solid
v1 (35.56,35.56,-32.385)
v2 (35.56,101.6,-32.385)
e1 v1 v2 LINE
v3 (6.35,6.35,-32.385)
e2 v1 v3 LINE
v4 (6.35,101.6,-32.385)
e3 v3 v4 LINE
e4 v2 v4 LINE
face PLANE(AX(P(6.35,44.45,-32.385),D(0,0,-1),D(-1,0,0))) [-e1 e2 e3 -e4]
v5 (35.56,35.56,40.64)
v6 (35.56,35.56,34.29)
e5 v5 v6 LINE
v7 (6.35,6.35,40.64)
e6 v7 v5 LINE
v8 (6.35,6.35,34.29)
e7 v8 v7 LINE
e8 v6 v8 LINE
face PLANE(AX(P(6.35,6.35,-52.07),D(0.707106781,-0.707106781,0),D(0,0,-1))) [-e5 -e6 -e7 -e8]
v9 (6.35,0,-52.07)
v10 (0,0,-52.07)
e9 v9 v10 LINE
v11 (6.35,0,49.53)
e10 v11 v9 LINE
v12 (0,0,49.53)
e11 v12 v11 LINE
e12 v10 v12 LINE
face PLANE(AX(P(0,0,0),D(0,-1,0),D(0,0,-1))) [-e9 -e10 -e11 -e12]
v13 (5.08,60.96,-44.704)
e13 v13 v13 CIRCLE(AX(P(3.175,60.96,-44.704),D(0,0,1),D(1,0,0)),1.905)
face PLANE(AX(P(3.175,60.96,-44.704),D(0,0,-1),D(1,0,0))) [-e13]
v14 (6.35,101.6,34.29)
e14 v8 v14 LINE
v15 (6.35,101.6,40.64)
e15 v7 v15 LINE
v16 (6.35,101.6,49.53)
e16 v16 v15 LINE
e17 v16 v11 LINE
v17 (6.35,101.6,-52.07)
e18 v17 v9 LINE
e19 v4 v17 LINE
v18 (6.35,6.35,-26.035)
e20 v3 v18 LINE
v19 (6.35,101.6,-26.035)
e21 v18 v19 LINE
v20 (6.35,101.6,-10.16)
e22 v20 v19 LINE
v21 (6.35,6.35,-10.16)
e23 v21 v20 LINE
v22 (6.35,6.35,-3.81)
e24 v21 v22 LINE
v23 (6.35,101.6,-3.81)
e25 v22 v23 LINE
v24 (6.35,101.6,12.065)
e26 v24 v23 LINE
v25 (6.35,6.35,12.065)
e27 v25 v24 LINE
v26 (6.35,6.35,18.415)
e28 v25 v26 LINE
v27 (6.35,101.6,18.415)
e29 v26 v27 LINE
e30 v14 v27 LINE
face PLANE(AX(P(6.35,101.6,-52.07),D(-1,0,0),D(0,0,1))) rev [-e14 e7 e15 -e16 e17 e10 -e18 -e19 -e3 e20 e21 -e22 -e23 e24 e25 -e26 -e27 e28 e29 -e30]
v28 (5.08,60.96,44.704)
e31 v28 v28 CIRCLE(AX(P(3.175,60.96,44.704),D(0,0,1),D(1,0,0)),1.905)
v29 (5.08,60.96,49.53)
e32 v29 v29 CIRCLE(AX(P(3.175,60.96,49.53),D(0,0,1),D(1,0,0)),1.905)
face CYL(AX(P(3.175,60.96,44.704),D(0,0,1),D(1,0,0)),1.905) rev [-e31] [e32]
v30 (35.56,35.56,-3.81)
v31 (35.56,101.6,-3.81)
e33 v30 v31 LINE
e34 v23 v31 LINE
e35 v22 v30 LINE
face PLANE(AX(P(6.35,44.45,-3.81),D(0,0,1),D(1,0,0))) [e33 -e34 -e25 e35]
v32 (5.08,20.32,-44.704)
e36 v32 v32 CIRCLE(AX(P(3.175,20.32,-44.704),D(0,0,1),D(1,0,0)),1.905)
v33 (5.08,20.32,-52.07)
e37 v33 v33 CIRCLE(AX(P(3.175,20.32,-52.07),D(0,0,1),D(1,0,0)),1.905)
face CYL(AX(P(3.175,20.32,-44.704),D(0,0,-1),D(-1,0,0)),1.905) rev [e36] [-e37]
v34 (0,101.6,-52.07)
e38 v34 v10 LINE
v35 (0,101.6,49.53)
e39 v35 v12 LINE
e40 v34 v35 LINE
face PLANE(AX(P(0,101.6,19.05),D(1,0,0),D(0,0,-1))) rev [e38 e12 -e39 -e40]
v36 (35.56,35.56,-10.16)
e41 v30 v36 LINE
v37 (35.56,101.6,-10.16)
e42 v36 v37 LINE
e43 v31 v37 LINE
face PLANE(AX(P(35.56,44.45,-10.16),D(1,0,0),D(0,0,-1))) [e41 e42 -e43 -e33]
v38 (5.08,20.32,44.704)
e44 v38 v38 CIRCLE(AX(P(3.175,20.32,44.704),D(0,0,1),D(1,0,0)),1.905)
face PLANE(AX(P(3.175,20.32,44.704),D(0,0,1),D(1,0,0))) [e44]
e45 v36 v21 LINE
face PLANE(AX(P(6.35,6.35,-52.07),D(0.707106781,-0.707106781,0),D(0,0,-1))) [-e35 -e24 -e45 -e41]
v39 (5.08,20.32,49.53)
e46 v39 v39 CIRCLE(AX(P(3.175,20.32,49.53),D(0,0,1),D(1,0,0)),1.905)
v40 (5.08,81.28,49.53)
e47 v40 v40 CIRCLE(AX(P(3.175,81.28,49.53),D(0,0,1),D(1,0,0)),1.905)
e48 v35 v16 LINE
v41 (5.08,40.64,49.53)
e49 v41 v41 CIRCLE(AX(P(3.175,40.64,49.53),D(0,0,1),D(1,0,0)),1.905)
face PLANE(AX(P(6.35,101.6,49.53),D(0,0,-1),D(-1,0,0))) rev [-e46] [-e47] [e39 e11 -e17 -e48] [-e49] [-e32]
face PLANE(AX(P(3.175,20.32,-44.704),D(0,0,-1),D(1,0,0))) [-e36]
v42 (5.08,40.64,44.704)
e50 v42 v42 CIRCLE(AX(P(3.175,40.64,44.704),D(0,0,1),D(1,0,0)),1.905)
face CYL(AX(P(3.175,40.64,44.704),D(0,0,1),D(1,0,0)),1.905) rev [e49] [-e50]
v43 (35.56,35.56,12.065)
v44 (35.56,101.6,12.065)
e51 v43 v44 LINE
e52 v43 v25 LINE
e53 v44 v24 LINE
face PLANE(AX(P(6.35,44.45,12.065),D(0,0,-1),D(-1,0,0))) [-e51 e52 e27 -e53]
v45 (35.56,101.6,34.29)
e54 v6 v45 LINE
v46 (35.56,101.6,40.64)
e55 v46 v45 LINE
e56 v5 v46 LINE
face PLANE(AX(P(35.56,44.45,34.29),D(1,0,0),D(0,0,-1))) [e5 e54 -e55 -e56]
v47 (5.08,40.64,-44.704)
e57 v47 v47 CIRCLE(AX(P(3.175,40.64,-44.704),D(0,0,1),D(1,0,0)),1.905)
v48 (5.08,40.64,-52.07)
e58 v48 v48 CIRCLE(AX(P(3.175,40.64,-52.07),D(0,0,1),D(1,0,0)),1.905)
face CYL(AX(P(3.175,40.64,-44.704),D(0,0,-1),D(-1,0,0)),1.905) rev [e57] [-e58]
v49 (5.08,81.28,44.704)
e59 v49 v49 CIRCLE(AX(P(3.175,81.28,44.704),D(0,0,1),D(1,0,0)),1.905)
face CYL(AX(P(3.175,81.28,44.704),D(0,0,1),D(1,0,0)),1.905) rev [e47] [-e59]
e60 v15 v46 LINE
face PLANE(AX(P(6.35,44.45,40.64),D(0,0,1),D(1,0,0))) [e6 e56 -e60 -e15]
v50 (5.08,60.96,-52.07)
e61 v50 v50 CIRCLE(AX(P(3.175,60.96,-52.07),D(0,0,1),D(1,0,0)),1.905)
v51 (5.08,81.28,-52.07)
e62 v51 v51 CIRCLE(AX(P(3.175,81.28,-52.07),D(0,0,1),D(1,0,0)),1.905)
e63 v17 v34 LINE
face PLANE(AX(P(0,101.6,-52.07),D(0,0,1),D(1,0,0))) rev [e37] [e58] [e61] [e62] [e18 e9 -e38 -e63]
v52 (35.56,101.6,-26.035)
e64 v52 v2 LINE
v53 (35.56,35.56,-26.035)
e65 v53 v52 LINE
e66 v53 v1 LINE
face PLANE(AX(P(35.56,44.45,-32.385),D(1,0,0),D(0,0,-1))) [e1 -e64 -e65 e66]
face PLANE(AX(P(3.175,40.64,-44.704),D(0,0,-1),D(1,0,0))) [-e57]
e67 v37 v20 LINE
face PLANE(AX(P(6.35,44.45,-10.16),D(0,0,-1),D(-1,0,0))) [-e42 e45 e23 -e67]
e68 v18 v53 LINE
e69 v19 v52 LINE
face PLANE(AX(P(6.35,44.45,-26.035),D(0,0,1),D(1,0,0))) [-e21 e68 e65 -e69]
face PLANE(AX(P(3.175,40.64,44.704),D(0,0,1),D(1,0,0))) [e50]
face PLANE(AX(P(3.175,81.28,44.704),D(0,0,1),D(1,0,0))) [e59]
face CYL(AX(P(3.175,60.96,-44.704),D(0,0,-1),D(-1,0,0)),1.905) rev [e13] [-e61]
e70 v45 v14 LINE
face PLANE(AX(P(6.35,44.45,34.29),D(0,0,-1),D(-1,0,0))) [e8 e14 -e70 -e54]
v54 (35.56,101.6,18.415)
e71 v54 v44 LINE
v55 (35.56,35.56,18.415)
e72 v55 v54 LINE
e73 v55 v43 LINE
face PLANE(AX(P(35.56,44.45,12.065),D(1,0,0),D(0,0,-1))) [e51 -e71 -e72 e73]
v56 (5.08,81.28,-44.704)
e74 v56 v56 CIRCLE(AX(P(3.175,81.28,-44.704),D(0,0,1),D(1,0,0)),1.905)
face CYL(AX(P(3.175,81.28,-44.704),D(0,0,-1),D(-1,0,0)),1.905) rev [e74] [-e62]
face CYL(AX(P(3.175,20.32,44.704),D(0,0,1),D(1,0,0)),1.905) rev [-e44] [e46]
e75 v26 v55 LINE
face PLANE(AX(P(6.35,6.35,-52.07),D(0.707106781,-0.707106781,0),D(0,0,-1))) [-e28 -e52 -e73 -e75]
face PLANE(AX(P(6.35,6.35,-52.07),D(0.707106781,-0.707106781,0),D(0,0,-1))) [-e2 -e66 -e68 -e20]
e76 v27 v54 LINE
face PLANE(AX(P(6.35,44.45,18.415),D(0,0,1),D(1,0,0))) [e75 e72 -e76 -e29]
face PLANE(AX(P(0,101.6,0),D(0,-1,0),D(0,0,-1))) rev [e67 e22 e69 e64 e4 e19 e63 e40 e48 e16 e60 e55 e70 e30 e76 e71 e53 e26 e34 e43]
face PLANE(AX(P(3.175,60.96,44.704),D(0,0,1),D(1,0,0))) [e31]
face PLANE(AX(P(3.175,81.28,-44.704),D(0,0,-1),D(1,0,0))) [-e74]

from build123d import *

# Parameters (mm, degrees)
BOSS_EXTRUDE1_DEPTH = 101.6
SKETCH2_R           = 1.905
CUT_EXTRUDE1_DEPTH  = 4.826
SKETCH5_W           = 29.21
SKETCH5_H           = 6.35
BOSS_EXTRUDE2_DEPTH = 57.15
CHAMFER1_SIZE       = 38.1
CUT_EXTRUDE2_START  = -101.6
SKETCH2_2_R         = 1.905
CUT_EXTRUDE2_DEPTH  = 4.826


with BuildPart() as part:
    # Sketch1 → Boss-Extrude1 (new body)
    with BuildSketch(Plane(origin=(0, 0, 0), x_dir=(1, 0, 0), z_dir=(0, 1, 0))):
        Polygon((0, -19.05), (0, 19.05), (0, 52.07), (6.35, 52.07), (6.35, 19.05), (6.35, -19.05), (6.35, -49.53), (0, -49.53), align=None)
    extrude(amount=BOSS_EXTRUDE1_DEPTH)

    # Sketch2 → Cut-Extrude1 (cut)
    with BuildSketch(Plane.XY.offset(49.53)):
        with Locations((3.175, 81.28)):
            Circle(SKETCH2_R)
        with Locations((3.175, 60.96)):
            Circle(SKETCH2_R)
        with Locations((3.175, 20.32)):
            Circle(SKETCH2_R)
        with Locations((3.175, 40.64)):
            Circle(SKETCH2_R)
    cut_extrude1 = extrude(amount=-CUT_EXTRUDE1_DEPTH, mode=Mode.SUBTRACT)

    # Mirror1: Cut-Extrude1 across plane
    add(cut_extrude1.mirror(Plane.XY), mode=Mode.SUBTRACT)

    # Sketch5 → Boss-Extrude2 (add)
    with BuildSketch(Plane(origin=(0, 101.6, 0), x_dir=(1, 0, 0), z_dir=(0, 1, 0))):
        with Locations((20.955, 29.21)):
            Rectangle(SKETCH5_W, SKETCH5_H)
        with Locations((20.955, 6.985)):
            Rectangle(SKETCH5_W, SKETCH5_H)
        with Locations((20.955, -15.24)):
            Rectangle(SKETCH5_W, SKETCH5_H)
        with Locations((20.955, -37.465)):
            Rectangle(SKETCH5_W, SKETCH5_H)
    extrude(amount=-BOSS_EXTRUDE2_DEPTH)

    # Chamfer1
    # the kernel refuses this chamfer: 38.1 mm, written as the material it adds along each edge
    with BuildSketch(Plane(origin=(6.35, 44.45, 71.946121842), x_dir=(-0.02749587661058638, -0.9996219169112968, 0), z_dir=(0, 0, -1))) as chamfer1_piece_1_section:
        Polygon((CHAMFER1_SIZE * 0.999621916911, -CHAMFER1_SIZE * 0.0274958766106), (-CHAMFER1_SIZE * 0.0274958766106, -CHAMFER1_SIZE * 0.999621916911), (0, 0), align=None)
    chamfer1_piece_1 = extrude(amount=104.331121842, mode=Mode.PRIVATE)
    chamfer1_piece_1 = split(chamfer1_piece_1, bisect_by=Plane(origin=(17.461394365, 31.123016765, 40.64), z_dir=(0, 0, -1)), keep=Keep.TOP, mode=Mode.PRIVATE)
    chamfer1_piece_1 = split(chamfer1_piece_1, bisect_by=Plane(origin=(17.461394365, 31.123016765, 34.29), z_dir=(0, 0, 1)), keep=Keep.TOP, mode=Mode.PRIVATE)
    chamfer1_piece_1 = split(chamfer1_piece_1, bisect_by=Plane(origin=(35.56, 31.123016765, 37.465), z_dir=(-1, 0, 0)), keep=Keep.TOP, mode=Mode.PRIVATE)
    add(chamfer1_piece_1)
    with BuildSketch(Plane(origin=(6.35, 44.45, 71.946121842), x_dir=(-0.02749587661058638, -0.9996219169112968, 0), z_dir=(0, 0, -1))) as chamfer1_piece_2_section:
        Polygon((CHAMFER1_SIZE * 0.999621916911, -CHAMFER1_SIZE * 0.0274958766106), (-CHAMFER1_SIZE * 0.0274958766106, -CHAMFER1_SIZE * 0.999621916911), (0, 0), align=None)
    chamfer1_piece_2 = extrude(amount=104.331121842, mode=Mode.PRIVATE)
    chamfer1_piece_2 = split(chamfer1_piece_2, bisect_by=Plane(origin=(35.56, 31.123016765, 15.24), z_dir=(-1, 0, 0)), keep=Keep.TOP, mode=Mode.PRIVATE)
    chamfer1_piece_2 = split(chamfer1_piece_2, bisect_by=Plane(origin=(17.461394365, 31.123016765, 18.415), z_dir=(0, 0, -1)), keep=Keep.TOP, mode=Mode.PRIVATE)
    chamfer1_piece_2 = split(chamfer1_piece_2, bisect_by=Plane(origin=(17.461394365, 31.123016765, 12.065), z_dir=(0, 0, 1)), keep=Keep.TOP, mode=Mode.PRIVATE)
    add(chamfer1_piece_2)
    with BuildSketch(Plane(origin=(6.35, 44.45, 71.946121842), x_dir=(-0.02749587661058638, -0.9996219169112968, 0), z_dir=(0, 0, -1))) as chamfer1_piece_3_section:
        Polygon((CHAMFER1_SIZE * 0.999621916911, -CHAMFER1_SIZE * 0.0274958766106), (-CHAMFER1_SIZE * 0.0274958766106, -CHAMFER1_SIZE * 0.999621916911), (0, 0), align=None)
    chamfer1_piece_3 = extrude(amount=104.331121842, mode=Mode.PRIVATE)
    chamfer1_piece_3 = split(chamfer1_piece_3, bisect_by=Plane(origin=(35.56, 31.123016765, -6.985), z_dir=(-1, 0, 0)), keep=Keep.TOP, mode=Mode.PRIVATE)
    chamfer1_piece_3 = split(chamfer1_piece_3, bisect_by=Plane(origin=(17.461394365, 31.123016765, -3.81), z_dir=(0, 0, -1)), keep=Keep.TOP, mode=Mode.PRIVATE)
    chamfer1_piece_3 = split(chamfer1_piece_3, bisect_by=Plane(origin=(17.461394365, 31.123016765, -10.16), z_dir=(0, 0, 1)), keep=Keep.TOP, mode=Mode.PRIVATE)
    add(chamfer1_piece_3)
    with BuildSketch(Plane(origin=(6.35, 44.45, -26.035), x_dir=(-0.027495876610586018, -0.9996219169112968, 0), z_dir=(0, 0, -1))) as chamfer1_piece_4_section:
        Polygon((CHAMFER1_SIZE * 0.999621916911, -CHAMFER1_SIZE * 0.0274958766106), (-CHAMFER1_SIZE * 0.0274958766106, -CHAMFER1_SIZE * 0.999621916911), (0, 0), align=None)
    chamfer1_piece_4 = extrude(amount=6.35, mode=Mode.PRIVATE)
    chamfer1_piece_4 = split(chamfer1_piece_4, bisect_by=Plane(origin=(35.56, 31.123016765, -29.21), z_dir=(-1, 0, 0)), keep=Keep.TOP, mode=Mode.PRIVATE)
    add(chamfer1_piece_4)
    with BuildSketch(Plane(origin=(6.35, 44.45, 94.171121842), x_dir=(-0.02749587661058638, -0.9996219169112968, 0), z_dir=(0, 0, -1))) as chamfer1_piece_5_section:
        Polygon((CHAMFER1_SIZE * 0.999621916911, -CHAMFER1_SIZE * 0.0274958766106), (-CHAMFER1_SIZE * 0.0274958766106, -CHAMFER1_SIZE * 0.999621916911), (0, 0), align=None)
    chamfer1_piece_5 = extrude(amount=104.331121842, mode=Mode.PRIVATE)
    chamfer1_piece_5 = split(chamfer1_piece_5, bisect_by=Plane(origin=(17.461394365, 31.123016765, 40.64), z_dir=(0, 0, -1)), keep=Keep.TOP, mode=Mode.PRIVATE)
    chamfer1_piece_5 = split(chamfer1_piece_5, bisect_by=Plane(origin=(17.461394365, 31.123016765, 34.29), z_dir=(0, 0, 1)), keep=Keep.TOP, mode=Mode.PRIVATE)
    chamfer1_piece_5 = split(chamfer1_piece_5, bisect_by=Plane(origin=(35.56, 31.123016765, 37.465), z_dir=(-1, 0, 0)), keep=Keep.TOP, mode=Mode.PRIVATE)
    add(chamfer1_piece_5)
    with BuildSketch(Plane(origin=(6.35, 44.45, 94.171121842), x_dir=(-0.02749587661058638, -0.9996219169112968, 0), z_dir=(0, 0, -1))) as chamfer1_piece_6_section:
        Polygon((CHAMFER1_SIZE * 0.999621916911, -CHAMFER1_SIZE * 0.0274958766106), (-CHAMFER1_SIZE * 0.0274958766106, -CHAMFER1_SIZE * 0.999621916911), (0, 0), align=None)
    chamfer1_piece_6 = extrude(amount=104.331121842, mode=Mode.PRIVATE)
    chamfer1_piece_6 = split(chamfer1_piece_6, bisect_by=Plane(origin=(35.56, 31.123016765, 15.24), z_dir=(-1, 0, 0)), keep=Keep.TOP, mode=Mode.PRIVATE)
    chamfer1_piece_6 = split(chamfer1_piece_6, bisect_by=Plane(origin=(17.461394365, 31.123016765, 18.415), z_dir=(0, 0, -1)), keep=Keep.TOP, mode=Mode.PRIVATE)
    chamfer1_piece_6 = split(chamfer1_piece_6, bisect_by=Plane(origin=(17.461394365, 31.123016765, 12.065), z_dir=(0, 0, 1)), keep=Keep.TOP, mode=Mode.PRIVATE)
    add(chamfer1_piece_6)
    with BuildSketch(Plane(origin=(6.35, 44.45, -3.81), x_dir=(-0.027495876610585814, -0.9996219169112968, 0), z_dir=(0, 0, -1))) as chamfer1_piece_7_section:
        Polygon((CHAMFER1_SIZE * 0.999621916911, -CHAMFER1_SIZE * 0.0274958766106), (-CHAMFER1_SIZE * 0.0274958766106, -CHAMFER1_SIZE * 0.999621916911), (0, 0), align=None)
    chamfer1_piece_7 = extrude(amount=6.35, mode=Mode.PRIVATE)
    chamfer1_piece_7 = split(chamfer1_piece_7, bisect_by=Plane(origin=(35.56, 31.123016765, -6.985), z_dir=(-1, 0, 0)), keep=Keep.TOP, mode=Mode.PRIVATE)
    add(chamfer1_piece_7)
    with BuildSketch(Plane(origin=(6.35, 44.45, -3.81), x_dir=(-0.027495876610585814, -0.9996219169112968, 0), z_dir=(0, 0, -1))) as chamfer1_piece_8_section:
        Polygon((CHAMFER1_SIZE * 0.999621916911, -CHAMFER1_SIZE * 0.0274958766106), (-CHAMFER1_SIZE * 0.0274958766106, -CHAMFER1_SIZE * 0.999621916911), (0, 0), align=None)
    chamfer1_piece_8 = extrude(amount=104.331121842, mode=Mode.PRIVATE)
    chamfer1_piece_8 = split(chamfer1_piece_8, bisect_by=Plane(origin=(35.56, 31.123016765, -29.21), z_dir=(-1, 0, 0)), keep=Keep.TOP, mode=Mode.PRIVATE)
    chamfer1_piece_8 = split(chamfer1_piece_8, bisect_by=Plane(origin=(17.461394365, 31.123016765, -26.035), z_dir=(0, 0, -1)), keep=Keep.TOP, mode=Mode.PRIVATE)
    chamfer1_piece_8 = split(chamfer1_piece_8, bisect_by=Plane(origin=(17.461394365, 31.123016765, -32.385), z_dir=(0, 0, 1)), keep=Keep.TOP, mode=Mode.PRIVATE)
    add(chamfer1_piece_8)
    with BuildSketch(Plane(origin=(6.35, 44.45, 116.396121842), x_dir=(-0.02749587661058638, -0.9996219169112968, 0), z_dir=(0, 0, -1))) as chamfer1_piece_9_section:
        Polygon((CHAMFER1_SIZE * 0.999621916911, -CHAMFER1_SIZE * 0.0274958766106), (-CHAMFER1_SIZE * 0.0274958766106, -CHAMFER1_SIZE * 0.999621916911), (0, 0), align=None)
    chamfer1_piece_9 = extrude(amount=104.331121842, mode=Mode.PRIVATE)
    chamfer1_piece_9 = split(chamfer1_piece_9, bisect_by=Plane(origin=(17.461394365, 31.123016765, 40.64), z_dir=(0, 0, -1)), keep=Keep.TOP, mode=Mode.PRIVATE)
    chamfer1_piece_9 = split(chamfer1_piece_9, bisect_by=Plane(origin=(17.461394365, 31.123016765, 34.29), z_dir=(0, 0, 1)), keep=Keep.TOP, mode=Mode.PRIVATE)
    chamfer1_piece_9 = split(chamfer1_piece_9, bisect_by=Plane(origin=(35.56, 31.123016765, 37.465), z_dir=(-1, 0, 0)), keep=Keep.TOP, mode=Mode.PRIVATE)
    add(chamfer1_piece_9)
    with BuildSketch(Plane(origin=(6.35, 44.45, 18.415), x_dir=(-0.02749587661058561, -0.9996219169112968, 0), z_dir=(0, 0, -1))) as chamfer1_piece_10_section:
        Polygon((CHAMFER1_SIZE * 0.999621916911, -CHAMFER1_SIZE * 0.0274958766106), (-CHAMFER1_SIZE * 0.0274958766106, -CHAMFER1_SIZE * 0.999621916911), (0, 0), align=None)
    chamfer1_piece_10 = extrude(amount=6.35, mode=Mode.PRIVATE)
    chamfer1_piece_10 = split(chamfer1_piece_10, bisect_by=Plane(origin=(35.56, 31.123016765, 15.24), z_dir=(-1, 0, 0)), keep=Keep.TOP, mode=Mode.PRIVATE)
    add(chamfer1_piece_10)
    with BuildSketch(Plane(origin=(6.35, 44.45, 18.415), x_dir=(-0.02749587661058561, -0.9996219169112968, 0), z_dir=(0, 0, -1))) as chamfer1_piece_11_section:
        Polygon((CHAMFER1_SIZE * 0.999621916911, -CHAMFER1_SIZE * 0.0274958766106), (-CHAMFER1_SIZE * 0.0274958766106, -CHAMFER1_SIZE * 0.999621916911), (0, 0), align=None)
    chamfer1_piece_11 = extrude(amount=104.331121842, mode=Mode.PRIVATE)
    chamfer1_piece_11 = split(chamfer1_piece_11, bisect_by=Plane(origin=(35.56, 31.123016765, -6.985), z_dir=(-1, 0, 0)), keep=Keep.TOP, mode=Mode.PRIVATE)
    chamfer1_piece_11 = split(chamfer1_piece_11, bisect_by=Plane(origin=(17.461394365, 31.123016765, -3.81), z_dir=(0, 0, -1)), keep=Keep.TOP, mode=Mode.PRIVATE)
    chamfer1_piece_11 = split(chamfer1_piece_11, bisect_by=Plane(origin=(17.461394365, 31.123016765, -10.16), z_dir=(0, 0, 1)), keep=Keep.TOP, mode=Mode.PRIVATE)
    add(chamfer1_piece_11)
    with BuildSketch(Plane(origin=(6.35, 44.45, 18.415), x_dir=(-0.02749587661058561, -0.9996219169112968, 0), z_dir=(0, 0, -1))) as chamfer1_piece_12_section:
        Polygon((CHAMFER1_SIZE * 0.999621916911, -CHAMFER1_SIZE * 0.0274958766106), (-CHAMFER1_SIZE * 0.0274958766106, -CHAMFER1_SIZE * 0.999621916911), (0, 0), align=None)
    chamfer1_piece_12 = extrude(amount=104.331121842, mode=Mode.PRIVATE)
    chamfer1_piece_12 = split(chamfer1_piece_12, bisect_by=Plane(origin=(35.56, 31.123016765, -29.21), z_dir=(-1, 0, 0)), keep=Keep.TOP, mode=Mode.PRIVATE)
    chamfer1_piece_12 = split(chamfer1_piece_12, bisect_by=Plane(origin=(17.461394365, 31.123016765, -26.035), z_dir=(0, 0, -1)), keep=Keep.TOP, mode=Mode.PRIVATE)
    chamfer1_piece_12 = split(chamfer1_piece_12, bisect_by=Plane(origin=(17.461394365, 31.123016765, -32.385), z_dir=(0, 0, 1)), keep=Keep.TOP, mode=Mode.PRIVATE)
    add(chamfer1_piece_12)
    with BuildSketch(Plane(origin=(6.35, 44.45, 40.64), x_dir=(-0.02749587661058536, -0.9996219169112968, 0), z_dir=(0, 0, -1))) as chamfer1_piece_13_section:
        Polygon((CHAMFER1_SIZE * 0.999621916911, -CHAMFER1_SIZE * 0.0274958766106), (-CHAMFER1_SIZE * 0.0274958766106, -CHAMFER1_SIZE * 0.999621916911), (0, 0), align=None)
    chamfer1_piece_13 = extrude(amount=6.35, mode=Mode.PRIVATE)
    chamfer1_piece_13 = split(chamfer1_piece_13, bisect_by=Plane(origin=(35.56, 31.123016765, 37.465), z_dir=(-1, 0, 0)), keep=Keep.TOP, mode=Mode.PRIVATE)
    add(chamfer1_piece_13)
    with BuildSketch(Plane(origin=(6.35, 44.45, 40.64), x_dir=(-0.02749587661058536, -0.9996219169112968, 0), z_dir=(0, 0, -1))) as chamfer1_piece_14_section:
        Polygon((CHAMFER1_SIZE * 0.999621916911, -CHAMFER1_SIZE * 0.0274958766106), (-CHAMFER1_SIZE * 0.0274958766106, -CHAMFER1_SIZE * 0.999621916911), (0, 0), align=None)
    chamfer1_piece_14 = extrude(amount=104.331121842, mode=Mode.PRIVATE)
    chamfer1_piece_14 = split(chamfer1_piece_14, bisect_by=Plane(origin=(35.56, 31.123016765, 15.24), z_dir=(-1, 0, 0)), keep=Keep.TOP, mode=Mode.PRIVATE)
    chamfer1_piece_14 = split(chamfer1_piece_14, bisect_by=Plane(origin=(17.461394365, 31.123016765, 18.415), z_dir=(0, 0, -1)), keep=Keep.TOP, mode=Mode.PRIVATE)
    chamfer1_piece_14 = split(chamfer1_piece_14, bisect_by=Plane(origin=(17.461394365, 31.123016765, 12.065), z_dir=(0, 0, 1)), keep=Keep.TOP, mode=Mode.PRIVATE)
    add(chamfer1_piece_14)
    with BuildSketch(Plane(origin=(6.35, 44.45, 40.64), x_dir=(-0.02749587661058536, -0.9996219169112968, 0), z_dir=(0, 0, -1))) as chamfer1_piece_15_section:
        Polygon((CHAMFER1_SIZE * 0.999621916911, -CHAMFER1_SIZE * 0.0274958766106), (-CHAMFER1_SIZE * 0.0274958766106, -CHAMFER1_SIZE * 0.999621916911), (0, 0), align=None)
    chamfer1_piece_15 = extrude(amount=104.331121842, mode=Mode.PRIVATE)
    chamfer1_piece_15 = split(chamfer1_piece_15, bisect_by=Plane(origin=(35.56, 31.123016765, -6.985), z_dir=(-1, 0, 0)), keep=Keep.TOP, mode=Mode.PRIVATE)
    chamfer1_piece_15 = split(chamfer1_piece_15, bisect_by=Plane(origin=(17.461394365, 31.123016765, -3.81), z_dir=(0, 0, -1)), keep=Keep.TOP, mode=Mode.PRIVATE)
    chamfer1_piece_15 = split(chamfer1_piece_15, bisect_by=Plane(origin=(17.461394365, 31.123016765, -10.16), z_dir=(0, 0, 1)), keep=Keep.TOP, mode=Mode.PRIVATE)
    add(chamfer1_piece_15)
    with BuildSketch(Plane(origin=(6.35, 44.45, 40.64), x_dir=(-0.02749587661058536, -0.9996219169112968, 0), z_dir=(0, 0, -1))) as chamfer1_piece_16_section:
        Polygon((CHAMFER1_SIZE * 0.999621916911, -CHAMFER1_SIZE * 0.0274958766106), (-CHAMFER1_SIZE * 0.0274958766106, -CHAMFER1_SIZE * 0.999621916911), (0, 0), align=None)
    chamfer1_piece_16 = extrude(amount=104.331121842, mode=Mode.PRIVATE)
    chamfer1_piece_16 = split(chamfer1_piece_16, bisect_by=Plane(origin=(35.56, 31.123016765, -29.21), z_dir=(-1, 0, 0)), keep=Keep.TOP, mode=Mode.PRIVATE)
    chamfer1_piece_16 = split(chamfer1_piece_16, bisect_by=Plane(origin=(17.461394365, 31.123016765, -26.035), z_dir=(0, 0, -1)), keep=Keep.TOP, mode=Mode.PRIVATE)
    chamfer1_piece_16 = split(chamfer1_piece_16, bisect_by=Plane(origin=(17.461394365, 31.123016765, -32.385), z_dir=(0, 0, 1)), keep=Keep.TOP, mode=Mode.PRIVATE)
    add(chamfer1_piece_16)

    # Sketch2<2> → Cut-Extrude2 (cut)
    with BuildSketch(Plane.XY.offset(49.53).offset(CUT_EXTRUDE2_START)):
        with Locations((3.175, 81.28)):
            Circle(SKETCH2_2_R)
        with Locations((3.175, 60.96)):
            Circle(SKETCH2_2_R)
        with Locations((3.175, 20.32)):
            Circle(SKETCH2_2_R)
        with Locations((3.175, 40.64)):
            Circle(SKETCH2_2_R)
    extrude(amount=CUT_EXTRUDE2_DEPTH, mode=Mode.SUBTRACT)


solid = part.part
